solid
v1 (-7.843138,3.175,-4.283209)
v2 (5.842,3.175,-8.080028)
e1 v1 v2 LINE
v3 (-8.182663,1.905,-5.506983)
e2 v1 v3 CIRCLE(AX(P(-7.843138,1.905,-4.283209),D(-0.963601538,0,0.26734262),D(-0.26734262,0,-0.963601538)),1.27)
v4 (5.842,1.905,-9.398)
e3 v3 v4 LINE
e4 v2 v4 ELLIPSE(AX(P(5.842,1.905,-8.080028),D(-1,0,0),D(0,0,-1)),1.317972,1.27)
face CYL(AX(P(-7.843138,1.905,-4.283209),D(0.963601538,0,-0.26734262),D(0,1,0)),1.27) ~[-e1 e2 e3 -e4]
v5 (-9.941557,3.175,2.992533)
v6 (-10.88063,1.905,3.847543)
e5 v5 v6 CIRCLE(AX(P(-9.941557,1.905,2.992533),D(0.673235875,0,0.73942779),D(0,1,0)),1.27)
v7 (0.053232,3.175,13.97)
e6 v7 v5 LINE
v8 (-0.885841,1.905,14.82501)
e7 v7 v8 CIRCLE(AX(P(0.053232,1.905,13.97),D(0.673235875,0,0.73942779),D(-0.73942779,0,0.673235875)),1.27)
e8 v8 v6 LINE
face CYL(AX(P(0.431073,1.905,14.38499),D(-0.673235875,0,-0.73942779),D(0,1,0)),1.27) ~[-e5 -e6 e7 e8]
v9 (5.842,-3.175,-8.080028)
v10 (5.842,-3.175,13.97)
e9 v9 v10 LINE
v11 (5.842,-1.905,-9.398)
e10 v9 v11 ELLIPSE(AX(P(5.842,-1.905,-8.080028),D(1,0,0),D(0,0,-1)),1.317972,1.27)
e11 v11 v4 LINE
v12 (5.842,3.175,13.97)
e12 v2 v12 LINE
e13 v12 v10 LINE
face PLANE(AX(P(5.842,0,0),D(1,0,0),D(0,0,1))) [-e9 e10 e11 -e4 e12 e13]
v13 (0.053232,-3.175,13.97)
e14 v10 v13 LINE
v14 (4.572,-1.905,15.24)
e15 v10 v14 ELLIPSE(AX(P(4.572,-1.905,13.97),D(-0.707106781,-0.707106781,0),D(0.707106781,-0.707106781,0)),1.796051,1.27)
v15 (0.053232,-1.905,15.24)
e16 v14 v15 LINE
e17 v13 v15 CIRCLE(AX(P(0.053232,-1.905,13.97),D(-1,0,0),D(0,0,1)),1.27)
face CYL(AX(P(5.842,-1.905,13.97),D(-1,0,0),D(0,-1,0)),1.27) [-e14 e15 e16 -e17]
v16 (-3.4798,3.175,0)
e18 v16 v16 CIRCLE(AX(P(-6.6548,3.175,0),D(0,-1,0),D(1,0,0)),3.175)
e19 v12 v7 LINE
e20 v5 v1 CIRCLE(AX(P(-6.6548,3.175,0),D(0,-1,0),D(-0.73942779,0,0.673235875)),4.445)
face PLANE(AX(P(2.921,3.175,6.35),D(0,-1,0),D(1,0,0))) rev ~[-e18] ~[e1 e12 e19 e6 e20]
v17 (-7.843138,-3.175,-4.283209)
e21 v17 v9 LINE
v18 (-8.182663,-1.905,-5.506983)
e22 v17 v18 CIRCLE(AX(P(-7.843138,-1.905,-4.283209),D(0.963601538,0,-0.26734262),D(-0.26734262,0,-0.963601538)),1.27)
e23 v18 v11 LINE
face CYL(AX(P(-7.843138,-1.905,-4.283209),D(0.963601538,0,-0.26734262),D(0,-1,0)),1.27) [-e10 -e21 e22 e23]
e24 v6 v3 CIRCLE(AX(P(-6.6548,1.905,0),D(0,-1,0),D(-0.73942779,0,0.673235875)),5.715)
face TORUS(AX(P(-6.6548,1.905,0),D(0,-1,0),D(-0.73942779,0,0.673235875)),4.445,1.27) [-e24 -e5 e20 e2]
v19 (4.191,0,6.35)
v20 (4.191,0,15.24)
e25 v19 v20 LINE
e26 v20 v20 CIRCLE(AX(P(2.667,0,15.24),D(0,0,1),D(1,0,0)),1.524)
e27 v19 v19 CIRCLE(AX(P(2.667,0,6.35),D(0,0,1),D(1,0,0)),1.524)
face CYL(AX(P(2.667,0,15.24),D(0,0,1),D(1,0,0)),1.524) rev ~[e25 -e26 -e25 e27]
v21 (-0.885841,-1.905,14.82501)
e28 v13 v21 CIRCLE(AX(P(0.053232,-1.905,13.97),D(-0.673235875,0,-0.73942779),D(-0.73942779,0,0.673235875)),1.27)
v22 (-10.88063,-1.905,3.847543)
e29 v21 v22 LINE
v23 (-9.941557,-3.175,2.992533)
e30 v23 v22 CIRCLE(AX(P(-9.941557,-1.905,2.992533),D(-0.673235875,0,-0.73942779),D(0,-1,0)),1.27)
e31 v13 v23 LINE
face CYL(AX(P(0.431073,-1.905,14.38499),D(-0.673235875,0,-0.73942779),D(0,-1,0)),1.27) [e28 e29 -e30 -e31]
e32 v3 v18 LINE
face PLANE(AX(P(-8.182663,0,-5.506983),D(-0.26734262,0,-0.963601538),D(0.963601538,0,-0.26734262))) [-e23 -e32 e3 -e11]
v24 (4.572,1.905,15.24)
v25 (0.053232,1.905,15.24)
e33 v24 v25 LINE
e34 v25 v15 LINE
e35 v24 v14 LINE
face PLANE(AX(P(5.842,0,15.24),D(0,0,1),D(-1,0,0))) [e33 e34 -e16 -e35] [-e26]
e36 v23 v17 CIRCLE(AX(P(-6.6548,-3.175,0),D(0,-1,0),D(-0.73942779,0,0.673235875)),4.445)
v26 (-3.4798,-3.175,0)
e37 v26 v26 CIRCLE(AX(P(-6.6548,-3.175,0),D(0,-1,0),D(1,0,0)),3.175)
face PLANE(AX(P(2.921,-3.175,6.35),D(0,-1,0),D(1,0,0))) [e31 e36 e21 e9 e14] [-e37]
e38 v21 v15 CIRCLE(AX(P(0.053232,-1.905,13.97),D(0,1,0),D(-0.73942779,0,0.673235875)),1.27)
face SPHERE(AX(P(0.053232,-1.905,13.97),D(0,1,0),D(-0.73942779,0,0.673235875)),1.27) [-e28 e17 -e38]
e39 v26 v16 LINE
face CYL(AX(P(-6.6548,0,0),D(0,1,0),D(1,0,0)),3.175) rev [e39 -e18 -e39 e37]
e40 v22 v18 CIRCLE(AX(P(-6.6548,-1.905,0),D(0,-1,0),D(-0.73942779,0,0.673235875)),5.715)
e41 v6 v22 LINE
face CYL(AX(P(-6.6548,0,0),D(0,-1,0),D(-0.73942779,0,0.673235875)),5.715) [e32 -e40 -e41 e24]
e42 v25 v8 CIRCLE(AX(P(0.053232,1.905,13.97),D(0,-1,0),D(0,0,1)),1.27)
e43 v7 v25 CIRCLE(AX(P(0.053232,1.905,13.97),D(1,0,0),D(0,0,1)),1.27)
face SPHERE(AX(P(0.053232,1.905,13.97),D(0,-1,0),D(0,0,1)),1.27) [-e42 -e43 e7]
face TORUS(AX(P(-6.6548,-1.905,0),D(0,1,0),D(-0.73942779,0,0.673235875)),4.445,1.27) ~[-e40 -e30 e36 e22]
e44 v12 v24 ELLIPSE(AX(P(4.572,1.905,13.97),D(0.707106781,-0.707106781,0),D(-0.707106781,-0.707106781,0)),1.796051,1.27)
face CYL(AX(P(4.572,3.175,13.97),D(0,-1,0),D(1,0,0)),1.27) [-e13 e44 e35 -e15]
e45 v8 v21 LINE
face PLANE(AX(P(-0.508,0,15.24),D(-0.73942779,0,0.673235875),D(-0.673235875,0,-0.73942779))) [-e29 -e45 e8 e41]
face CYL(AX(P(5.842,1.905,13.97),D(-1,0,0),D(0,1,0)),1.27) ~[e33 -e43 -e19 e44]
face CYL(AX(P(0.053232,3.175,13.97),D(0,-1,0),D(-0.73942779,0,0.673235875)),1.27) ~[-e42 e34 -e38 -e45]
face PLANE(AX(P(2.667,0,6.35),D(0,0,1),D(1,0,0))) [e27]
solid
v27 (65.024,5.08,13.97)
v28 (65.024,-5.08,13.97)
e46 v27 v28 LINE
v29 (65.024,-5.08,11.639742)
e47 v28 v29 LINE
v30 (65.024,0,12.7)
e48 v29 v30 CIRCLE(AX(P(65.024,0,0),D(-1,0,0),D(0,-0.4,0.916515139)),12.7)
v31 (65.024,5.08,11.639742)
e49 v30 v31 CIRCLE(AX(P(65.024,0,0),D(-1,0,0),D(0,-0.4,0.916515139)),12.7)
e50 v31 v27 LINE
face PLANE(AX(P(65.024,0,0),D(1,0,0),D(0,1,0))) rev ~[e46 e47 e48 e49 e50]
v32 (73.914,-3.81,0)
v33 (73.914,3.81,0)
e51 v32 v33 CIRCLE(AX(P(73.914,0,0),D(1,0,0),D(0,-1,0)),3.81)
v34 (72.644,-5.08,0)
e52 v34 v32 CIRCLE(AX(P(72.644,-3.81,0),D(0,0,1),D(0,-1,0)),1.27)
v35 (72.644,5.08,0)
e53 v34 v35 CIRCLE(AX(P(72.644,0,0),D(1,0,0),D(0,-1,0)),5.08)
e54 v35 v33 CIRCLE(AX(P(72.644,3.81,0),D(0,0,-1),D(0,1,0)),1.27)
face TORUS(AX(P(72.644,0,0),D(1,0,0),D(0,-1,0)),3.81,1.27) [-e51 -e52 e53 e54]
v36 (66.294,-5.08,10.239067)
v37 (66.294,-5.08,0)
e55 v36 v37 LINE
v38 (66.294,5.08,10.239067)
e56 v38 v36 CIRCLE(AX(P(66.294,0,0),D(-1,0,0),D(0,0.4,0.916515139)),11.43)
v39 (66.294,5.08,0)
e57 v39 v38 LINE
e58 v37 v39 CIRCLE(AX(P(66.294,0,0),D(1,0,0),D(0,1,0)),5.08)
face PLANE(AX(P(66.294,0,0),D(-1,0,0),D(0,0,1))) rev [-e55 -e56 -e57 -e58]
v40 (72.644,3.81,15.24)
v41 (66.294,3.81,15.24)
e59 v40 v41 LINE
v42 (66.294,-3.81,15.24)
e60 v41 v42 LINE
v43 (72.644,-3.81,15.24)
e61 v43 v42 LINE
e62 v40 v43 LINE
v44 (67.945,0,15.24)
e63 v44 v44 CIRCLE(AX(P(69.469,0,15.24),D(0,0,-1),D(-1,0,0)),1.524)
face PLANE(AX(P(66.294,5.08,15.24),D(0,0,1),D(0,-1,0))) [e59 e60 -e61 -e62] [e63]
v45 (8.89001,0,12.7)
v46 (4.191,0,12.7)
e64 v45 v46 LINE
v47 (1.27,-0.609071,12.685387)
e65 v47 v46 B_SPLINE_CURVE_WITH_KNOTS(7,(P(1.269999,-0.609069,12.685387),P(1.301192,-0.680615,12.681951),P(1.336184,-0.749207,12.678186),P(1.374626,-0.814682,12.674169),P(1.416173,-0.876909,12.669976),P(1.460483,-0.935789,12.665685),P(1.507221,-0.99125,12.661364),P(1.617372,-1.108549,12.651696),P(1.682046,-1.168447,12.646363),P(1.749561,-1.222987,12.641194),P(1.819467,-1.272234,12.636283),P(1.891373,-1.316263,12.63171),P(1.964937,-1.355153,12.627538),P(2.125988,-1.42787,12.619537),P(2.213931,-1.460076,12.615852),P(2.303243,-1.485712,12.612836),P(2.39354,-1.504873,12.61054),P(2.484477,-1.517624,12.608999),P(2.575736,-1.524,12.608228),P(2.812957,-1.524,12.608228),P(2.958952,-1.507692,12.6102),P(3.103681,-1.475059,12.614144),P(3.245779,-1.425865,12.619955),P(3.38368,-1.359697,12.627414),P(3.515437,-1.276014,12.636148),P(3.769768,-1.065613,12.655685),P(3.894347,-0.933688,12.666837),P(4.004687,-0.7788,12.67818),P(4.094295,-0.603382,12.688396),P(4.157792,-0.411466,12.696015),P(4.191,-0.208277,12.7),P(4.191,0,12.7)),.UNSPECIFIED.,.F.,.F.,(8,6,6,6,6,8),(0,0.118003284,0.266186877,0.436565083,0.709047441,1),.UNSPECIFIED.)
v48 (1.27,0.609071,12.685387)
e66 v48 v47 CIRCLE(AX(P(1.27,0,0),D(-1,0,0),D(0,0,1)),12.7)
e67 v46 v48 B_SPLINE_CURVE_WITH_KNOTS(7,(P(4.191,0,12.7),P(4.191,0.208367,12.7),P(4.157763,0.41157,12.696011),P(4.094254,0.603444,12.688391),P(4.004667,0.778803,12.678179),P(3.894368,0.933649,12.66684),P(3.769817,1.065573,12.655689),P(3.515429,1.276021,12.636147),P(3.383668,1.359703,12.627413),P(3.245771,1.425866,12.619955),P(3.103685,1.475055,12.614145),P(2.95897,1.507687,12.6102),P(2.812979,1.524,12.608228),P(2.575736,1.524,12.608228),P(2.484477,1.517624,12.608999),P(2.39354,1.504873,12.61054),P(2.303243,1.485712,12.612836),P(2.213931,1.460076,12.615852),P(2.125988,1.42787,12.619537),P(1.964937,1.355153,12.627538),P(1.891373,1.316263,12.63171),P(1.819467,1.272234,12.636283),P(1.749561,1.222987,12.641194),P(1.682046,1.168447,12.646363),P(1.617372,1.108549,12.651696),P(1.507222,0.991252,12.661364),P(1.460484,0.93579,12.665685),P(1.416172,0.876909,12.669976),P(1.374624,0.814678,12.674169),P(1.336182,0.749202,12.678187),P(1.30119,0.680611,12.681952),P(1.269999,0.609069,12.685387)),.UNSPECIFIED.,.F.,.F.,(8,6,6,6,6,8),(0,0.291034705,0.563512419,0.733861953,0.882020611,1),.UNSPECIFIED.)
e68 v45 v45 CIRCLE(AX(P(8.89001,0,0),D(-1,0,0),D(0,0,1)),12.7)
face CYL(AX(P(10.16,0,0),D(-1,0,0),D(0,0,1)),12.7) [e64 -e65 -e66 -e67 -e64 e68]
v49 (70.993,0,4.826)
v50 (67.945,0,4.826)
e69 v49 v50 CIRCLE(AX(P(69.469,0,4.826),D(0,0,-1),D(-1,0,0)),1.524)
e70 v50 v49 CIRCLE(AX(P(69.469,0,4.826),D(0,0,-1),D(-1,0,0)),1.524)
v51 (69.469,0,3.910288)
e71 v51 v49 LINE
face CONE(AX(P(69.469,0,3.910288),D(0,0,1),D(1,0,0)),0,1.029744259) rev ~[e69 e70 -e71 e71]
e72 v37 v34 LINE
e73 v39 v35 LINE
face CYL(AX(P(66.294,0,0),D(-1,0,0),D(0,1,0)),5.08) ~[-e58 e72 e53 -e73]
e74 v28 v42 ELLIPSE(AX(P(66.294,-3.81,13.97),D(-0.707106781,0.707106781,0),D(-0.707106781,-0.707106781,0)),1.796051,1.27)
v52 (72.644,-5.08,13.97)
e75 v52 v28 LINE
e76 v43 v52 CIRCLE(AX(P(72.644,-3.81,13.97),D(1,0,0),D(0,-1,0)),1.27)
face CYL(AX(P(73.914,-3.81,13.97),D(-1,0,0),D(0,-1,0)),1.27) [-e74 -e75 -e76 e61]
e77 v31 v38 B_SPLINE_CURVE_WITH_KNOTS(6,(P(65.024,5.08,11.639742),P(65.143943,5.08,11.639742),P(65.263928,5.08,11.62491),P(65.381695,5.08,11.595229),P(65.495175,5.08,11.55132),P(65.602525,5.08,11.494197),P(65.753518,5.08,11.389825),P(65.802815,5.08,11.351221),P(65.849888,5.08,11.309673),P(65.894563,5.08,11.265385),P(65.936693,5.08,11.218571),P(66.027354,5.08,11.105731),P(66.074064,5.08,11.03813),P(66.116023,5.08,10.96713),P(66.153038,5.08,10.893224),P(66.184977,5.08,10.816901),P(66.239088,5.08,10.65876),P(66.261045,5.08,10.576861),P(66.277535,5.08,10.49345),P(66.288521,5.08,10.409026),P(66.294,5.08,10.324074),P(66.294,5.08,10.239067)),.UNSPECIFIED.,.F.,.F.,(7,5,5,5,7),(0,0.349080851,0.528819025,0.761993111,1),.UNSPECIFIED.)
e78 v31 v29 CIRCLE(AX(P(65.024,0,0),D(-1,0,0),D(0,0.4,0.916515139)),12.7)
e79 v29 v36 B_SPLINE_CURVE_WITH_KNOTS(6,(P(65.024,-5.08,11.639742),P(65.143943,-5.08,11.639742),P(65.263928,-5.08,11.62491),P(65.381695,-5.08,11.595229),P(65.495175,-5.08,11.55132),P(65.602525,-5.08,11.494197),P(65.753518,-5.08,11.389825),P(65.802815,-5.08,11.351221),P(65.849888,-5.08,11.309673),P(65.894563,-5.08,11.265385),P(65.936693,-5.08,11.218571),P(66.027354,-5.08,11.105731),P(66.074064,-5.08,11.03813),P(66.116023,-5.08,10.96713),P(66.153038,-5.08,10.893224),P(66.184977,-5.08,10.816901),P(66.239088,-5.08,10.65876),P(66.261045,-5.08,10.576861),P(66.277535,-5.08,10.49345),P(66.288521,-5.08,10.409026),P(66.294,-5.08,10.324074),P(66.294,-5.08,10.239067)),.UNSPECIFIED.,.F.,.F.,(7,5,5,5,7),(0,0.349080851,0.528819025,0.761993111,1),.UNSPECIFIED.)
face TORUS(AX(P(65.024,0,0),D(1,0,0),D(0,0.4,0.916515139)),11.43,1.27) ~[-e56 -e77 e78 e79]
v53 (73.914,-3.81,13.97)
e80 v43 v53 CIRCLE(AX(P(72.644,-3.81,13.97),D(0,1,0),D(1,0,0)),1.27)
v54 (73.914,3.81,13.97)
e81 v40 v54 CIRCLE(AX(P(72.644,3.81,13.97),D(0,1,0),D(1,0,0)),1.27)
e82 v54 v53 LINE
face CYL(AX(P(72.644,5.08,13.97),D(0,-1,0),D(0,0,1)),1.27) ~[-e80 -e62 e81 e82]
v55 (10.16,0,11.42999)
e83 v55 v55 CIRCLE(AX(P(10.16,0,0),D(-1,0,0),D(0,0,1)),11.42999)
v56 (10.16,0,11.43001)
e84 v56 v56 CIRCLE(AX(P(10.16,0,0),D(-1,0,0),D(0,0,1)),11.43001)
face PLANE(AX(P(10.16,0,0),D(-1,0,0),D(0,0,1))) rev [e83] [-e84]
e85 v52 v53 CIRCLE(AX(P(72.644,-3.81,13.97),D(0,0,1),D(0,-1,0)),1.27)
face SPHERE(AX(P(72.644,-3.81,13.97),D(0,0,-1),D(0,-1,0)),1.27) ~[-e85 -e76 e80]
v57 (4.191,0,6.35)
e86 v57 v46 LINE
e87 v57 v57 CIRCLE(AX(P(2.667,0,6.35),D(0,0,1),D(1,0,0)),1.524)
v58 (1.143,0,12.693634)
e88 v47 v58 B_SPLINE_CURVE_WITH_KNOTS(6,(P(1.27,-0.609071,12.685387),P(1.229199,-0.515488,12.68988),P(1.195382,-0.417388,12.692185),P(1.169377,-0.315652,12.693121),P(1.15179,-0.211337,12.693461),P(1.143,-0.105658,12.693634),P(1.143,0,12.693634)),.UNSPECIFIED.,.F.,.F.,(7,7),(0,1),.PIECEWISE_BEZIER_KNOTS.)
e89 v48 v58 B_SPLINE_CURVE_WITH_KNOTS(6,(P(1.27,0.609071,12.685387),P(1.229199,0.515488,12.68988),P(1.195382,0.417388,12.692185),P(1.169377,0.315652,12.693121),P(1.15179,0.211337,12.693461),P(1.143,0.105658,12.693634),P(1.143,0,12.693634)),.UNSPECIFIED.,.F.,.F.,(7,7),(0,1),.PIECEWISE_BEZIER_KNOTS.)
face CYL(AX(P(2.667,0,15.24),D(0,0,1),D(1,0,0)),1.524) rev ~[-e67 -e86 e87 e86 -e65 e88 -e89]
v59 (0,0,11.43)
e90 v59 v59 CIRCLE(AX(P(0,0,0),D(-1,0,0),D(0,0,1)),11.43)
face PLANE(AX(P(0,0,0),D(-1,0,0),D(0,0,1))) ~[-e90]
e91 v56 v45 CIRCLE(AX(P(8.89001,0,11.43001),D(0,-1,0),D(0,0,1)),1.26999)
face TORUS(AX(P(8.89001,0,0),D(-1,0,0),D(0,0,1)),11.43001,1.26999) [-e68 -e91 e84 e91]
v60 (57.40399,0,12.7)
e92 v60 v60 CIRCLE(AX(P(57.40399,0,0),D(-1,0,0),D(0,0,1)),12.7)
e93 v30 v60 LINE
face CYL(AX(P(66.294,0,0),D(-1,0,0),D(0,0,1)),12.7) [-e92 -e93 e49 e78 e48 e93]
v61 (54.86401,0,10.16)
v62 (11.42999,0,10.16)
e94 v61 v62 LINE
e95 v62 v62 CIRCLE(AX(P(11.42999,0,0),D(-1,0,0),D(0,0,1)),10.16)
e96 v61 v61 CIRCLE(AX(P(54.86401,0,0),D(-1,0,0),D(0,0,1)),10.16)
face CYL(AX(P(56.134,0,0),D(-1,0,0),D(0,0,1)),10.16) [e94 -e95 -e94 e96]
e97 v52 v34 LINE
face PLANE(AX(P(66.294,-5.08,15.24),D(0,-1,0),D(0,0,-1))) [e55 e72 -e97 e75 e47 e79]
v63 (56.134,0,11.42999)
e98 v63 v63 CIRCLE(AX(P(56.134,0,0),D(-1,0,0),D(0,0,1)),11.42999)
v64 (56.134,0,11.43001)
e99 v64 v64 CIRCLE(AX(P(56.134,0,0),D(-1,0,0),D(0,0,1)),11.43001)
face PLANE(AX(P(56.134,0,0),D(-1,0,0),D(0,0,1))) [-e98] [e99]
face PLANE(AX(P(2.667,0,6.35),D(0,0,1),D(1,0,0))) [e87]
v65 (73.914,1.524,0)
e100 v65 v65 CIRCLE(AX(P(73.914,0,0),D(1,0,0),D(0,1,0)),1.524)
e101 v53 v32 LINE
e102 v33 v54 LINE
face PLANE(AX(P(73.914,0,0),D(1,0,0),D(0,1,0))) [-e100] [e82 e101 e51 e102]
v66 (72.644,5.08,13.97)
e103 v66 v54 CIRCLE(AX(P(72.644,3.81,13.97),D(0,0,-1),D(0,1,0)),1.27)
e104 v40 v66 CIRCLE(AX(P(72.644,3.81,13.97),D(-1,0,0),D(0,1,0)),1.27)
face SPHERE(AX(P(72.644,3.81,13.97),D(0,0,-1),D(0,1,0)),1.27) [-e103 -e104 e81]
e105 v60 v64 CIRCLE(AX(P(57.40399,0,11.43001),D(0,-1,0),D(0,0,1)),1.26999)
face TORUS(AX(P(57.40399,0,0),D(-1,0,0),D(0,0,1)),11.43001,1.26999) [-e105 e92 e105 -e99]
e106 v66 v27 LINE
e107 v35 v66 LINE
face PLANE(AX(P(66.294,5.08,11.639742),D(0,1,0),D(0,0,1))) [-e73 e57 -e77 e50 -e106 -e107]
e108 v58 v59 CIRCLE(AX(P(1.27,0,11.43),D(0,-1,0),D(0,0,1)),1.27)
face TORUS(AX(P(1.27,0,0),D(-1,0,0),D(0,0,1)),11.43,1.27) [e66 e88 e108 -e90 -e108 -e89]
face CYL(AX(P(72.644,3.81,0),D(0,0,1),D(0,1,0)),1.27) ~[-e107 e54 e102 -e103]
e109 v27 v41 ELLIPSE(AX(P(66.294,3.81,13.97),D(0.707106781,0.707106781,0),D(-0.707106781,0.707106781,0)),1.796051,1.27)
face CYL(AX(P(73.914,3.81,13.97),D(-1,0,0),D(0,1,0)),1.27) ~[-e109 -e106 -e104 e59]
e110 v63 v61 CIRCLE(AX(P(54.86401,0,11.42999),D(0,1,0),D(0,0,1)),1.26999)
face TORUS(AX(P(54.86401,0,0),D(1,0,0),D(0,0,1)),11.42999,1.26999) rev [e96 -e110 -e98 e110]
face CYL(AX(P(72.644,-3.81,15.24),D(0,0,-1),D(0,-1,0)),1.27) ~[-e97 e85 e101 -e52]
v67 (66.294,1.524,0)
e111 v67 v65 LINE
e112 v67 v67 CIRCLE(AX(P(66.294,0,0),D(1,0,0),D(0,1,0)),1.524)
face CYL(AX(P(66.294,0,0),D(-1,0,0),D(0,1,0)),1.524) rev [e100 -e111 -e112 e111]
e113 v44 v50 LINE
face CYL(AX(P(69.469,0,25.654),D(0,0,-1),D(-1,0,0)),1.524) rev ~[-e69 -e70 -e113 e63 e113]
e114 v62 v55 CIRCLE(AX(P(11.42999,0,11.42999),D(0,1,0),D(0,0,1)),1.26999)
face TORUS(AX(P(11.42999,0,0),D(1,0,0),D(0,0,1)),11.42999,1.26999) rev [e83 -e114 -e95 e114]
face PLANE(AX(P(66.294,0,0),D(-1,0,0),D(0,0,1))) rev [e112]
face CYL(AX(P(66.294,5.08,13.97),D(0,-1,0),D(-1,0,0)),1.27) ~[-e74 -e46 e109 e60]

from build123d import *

# Parameters (mm, degrees)
F0_R      = 3.175
F1_DEPTH  = 3.175
F0_W      = 5.842
F0_H      = 12.7
F2_DEPTH  = 3.175
F4_R      = 1.524
F5_DEPTH  = 7.62
F6_DEPTH  = 1.27
F8_D      = 3.048
F8_DEPTH  = 10.414
F8_TIP    = 0.9157115834
F10_R     = 1.26999
F11_R     = 1.26999
F12_R     = 1.27
F13_R     = 1.27
F14_R     = 1.27
F14_2_R   = 1.27
F9_R      = 1.524
F15_DEPTH = 8.89


# Not quite as in the source:
# - a fillet or chamfer is up to 0.001 mm smaller than in the source, because OpenCascade refuses the exact size


with BuildPart() as f1:
    # F0 (on Front) → F1 (new body, symmetric)
    with BuildSketch(Plane.XZ):
        with BuildLine():
            Line((-0.9398, 0), (0, 0))
            Line((0, 0), (0, 12.7))
            Line((0, 12.7), (5.842, 12.7))
            Line((5.842, 12.7), (5.842, 15.24))
            Line((5.842, 15.24), (-0.508, 15.24))
            Line((-0.508, 15.24), (-10.8806298187, 3.8475430269))
            ThreePointArc((-10.8806298187, 3.8475430269), (-4.5919612295, 5.3297205562), (-0.9398, 0))
        make_face()
        with BuildLine():
            ThreePointArc((-8.1826630726, -5.5069827884), (-3.1957909266, -4.5493385486), (-0.9398, 0))
            ThreePointArc((-0.9398, 0), (-4.5919612295, 5.3297205562), (-10.8806298187, 3.8475430269))
            ThreePointArc((-10.8806298187, 3.8475430269), (-12.1459778134, -1.5837270034), (-8.1826630726, -5.5069827884))
        make_face()
        with Locations((-6.6548, 0)):
            Circle(F0_R, mode=Mode.SUBTRACT)
        with BuildLine():
            Line((5.842, 0), (0, 0))
            Line((0, 0), (-0.9398, 0))
            ThreePointArc((-0.9398, 0), (-3.1957909266, -4.5493385486), (-8.1826630726, -5.5069827884))
            Line((-8.1826630726, -5.5069827884), (5.842, -9.398))
            Line((5.842, -9.398), (5.842, 0))
        make_face()
    extrude(amount=F1_DEPTH, both=True)

    # F0 (on Front) → F2 (join, symmetric)
    with BuildSketch(Plane.XZ):
        with Locations((2.921, 6.35)):
            Rectangle(F0_W, F0_H)
    extrude(amount=F2_DEPTH, both=True)

    # F14
    f14_edges = [f1.edges().sort_by_distance(p)[0] for p in [
        (5.842, 0, 15.24),
        (2.667, -3.175, 15.24),
        (-0.508, 0, 15.24),
        (2.667, 3.175, 15.24),
        (-5.694315, -3.175, 9.543772),
        (-5.694315, 3.175, 9.543772),
    ]]
    fillet(f14_edges, radius=F14_R)


with BuildPart() as f3:
    # F0 (on Front) → F3 (revolve)
    with BuildSketch(Plane.XZ):
        Polygon((5.842, 12.7), (5.842, 0), (66.294, 0), (66.294, 12.7), (56.134, 12.7), (56.134, 10.16), (10.16, 10.16), (10.16, 12.7), align=None)
        with Locations((2.921, 6.35)):
            Rectangle(F0_W, F0_H)
    revolve(axis=Axis((33.147, 0, 0), (-1, 0, 0)))

    # F4 (on face) → F5 (join)
    with BuildSketch(Plane.YZ.offset(66.294)):
        with BuildLine():
            ThreePointArc((-5.08, 0), (0, -5.08), (5.08, 0))
            ThreePointArc((5.08, 0), (0, 5.08), (-5.08, 0))
        make_face()
        Circle(F4_R, mode=Mode.SUBTRACT)
        with BuildLine():
            ThreePointArc((-5.08, 0), (0, 5.08), (5.08, 0))
            Line((5.08, 0), (5.08, 15.24))
            Line((5.08, 15.24), (-5.08, 15.24))
            Line((-5.08, 15.24), (-5.08, 0))
        make_face()
    extrude(amount=F5_DEPTH)

    # F6 (add): a face of the model
    f6_faces = [f3.faces().sort_by_distance(p)[0] for p in [
        (66.294, 0, 13.7792682875),
    ]]
    extrude(f6_faces, amount=F6_DEPTH)

    # F8
    with Locations(Plane.XY.offset(15.24)):
        with Locations((69.469, 0)):
            Hole(F8_D / 2, depth=F8_DEPTH)
            with Locations((0, 0, -(F8_DEPTH + F8_TIP / 2))):  # 118° drill point
                Cone(0, F8_D / 2, F8_TIP, mode=Mode.SUBTRACT)

    # F10 (radius 1.27 in the source; OpenCascade refuses exactly that, so slightly less here)
    f10_edges = [f3.edges().sort_by_distance(p)[0] for p in [
        (56.134, 0, -12.7),
        (56.134, 0, -10.16),
    ]]
    fillet(f10_edges, radius=F10_R)

    # F11 (radius 1.27 in the source; OpenCascade refuses exactly that, so slightly less here)
    f11_edges = [f3.edges().sort_by_distance(p)[0] for p in [
        (10.16, 0, -10.16),
        (10.16, 0, -12.7),
    ]]
    fillet(f11_edges, radius=F11_R)

    # F12
    f12_edges = [f3.edges().sort_by_distance(p)[0] for p in [
        (0, 0, -12.7),
    ]]
    fillet(f12_edges, radius=F12_R)

    # F13
    f13_edges = [f3.edges().sort_by_distance(p)[0] for p in [
        (66.294, 0, -12.7),
    ]]
    fillet(f13_edges, radius=F13_R)

    # F14#2
    f14_2_edges = [f3.edges().sort_by_distance(p)[0] for p in [
        (73.914, -5.08, 7.62),
        (69.469, -5.08, 15.24),
        (69.469, 5.08, 15.24),
        (73.914, 0, 15.24),
        (65.024, 0, 15.24),
    ]]
    fillet(f14_2_edges, radius=F14_2_R)


with BuildPart() as f15_tool:
    # F9 (on face) → F15 (new body, symmetric)
    with BuildSketch(Plane.XY.offset(15.24)):
        with Locations((2.667, 0)):
            Circle(F9_R)
    extrude(amount=F15_DEPTH, both=True)


with BuildPart() as f1_1:
    add(f1.part)

    # F15: cut by f15_tool
    add(f15_tool.part, mode=Mode.SUBTRACT)


with BuildPart() as f3_1:
    add(f3.part)

    # F15: cut by f15_tool
    add(f15_tool.part, mode=Mode.SUBTRACT)


solid = Compound([f1_1.part, f3_1.part])
